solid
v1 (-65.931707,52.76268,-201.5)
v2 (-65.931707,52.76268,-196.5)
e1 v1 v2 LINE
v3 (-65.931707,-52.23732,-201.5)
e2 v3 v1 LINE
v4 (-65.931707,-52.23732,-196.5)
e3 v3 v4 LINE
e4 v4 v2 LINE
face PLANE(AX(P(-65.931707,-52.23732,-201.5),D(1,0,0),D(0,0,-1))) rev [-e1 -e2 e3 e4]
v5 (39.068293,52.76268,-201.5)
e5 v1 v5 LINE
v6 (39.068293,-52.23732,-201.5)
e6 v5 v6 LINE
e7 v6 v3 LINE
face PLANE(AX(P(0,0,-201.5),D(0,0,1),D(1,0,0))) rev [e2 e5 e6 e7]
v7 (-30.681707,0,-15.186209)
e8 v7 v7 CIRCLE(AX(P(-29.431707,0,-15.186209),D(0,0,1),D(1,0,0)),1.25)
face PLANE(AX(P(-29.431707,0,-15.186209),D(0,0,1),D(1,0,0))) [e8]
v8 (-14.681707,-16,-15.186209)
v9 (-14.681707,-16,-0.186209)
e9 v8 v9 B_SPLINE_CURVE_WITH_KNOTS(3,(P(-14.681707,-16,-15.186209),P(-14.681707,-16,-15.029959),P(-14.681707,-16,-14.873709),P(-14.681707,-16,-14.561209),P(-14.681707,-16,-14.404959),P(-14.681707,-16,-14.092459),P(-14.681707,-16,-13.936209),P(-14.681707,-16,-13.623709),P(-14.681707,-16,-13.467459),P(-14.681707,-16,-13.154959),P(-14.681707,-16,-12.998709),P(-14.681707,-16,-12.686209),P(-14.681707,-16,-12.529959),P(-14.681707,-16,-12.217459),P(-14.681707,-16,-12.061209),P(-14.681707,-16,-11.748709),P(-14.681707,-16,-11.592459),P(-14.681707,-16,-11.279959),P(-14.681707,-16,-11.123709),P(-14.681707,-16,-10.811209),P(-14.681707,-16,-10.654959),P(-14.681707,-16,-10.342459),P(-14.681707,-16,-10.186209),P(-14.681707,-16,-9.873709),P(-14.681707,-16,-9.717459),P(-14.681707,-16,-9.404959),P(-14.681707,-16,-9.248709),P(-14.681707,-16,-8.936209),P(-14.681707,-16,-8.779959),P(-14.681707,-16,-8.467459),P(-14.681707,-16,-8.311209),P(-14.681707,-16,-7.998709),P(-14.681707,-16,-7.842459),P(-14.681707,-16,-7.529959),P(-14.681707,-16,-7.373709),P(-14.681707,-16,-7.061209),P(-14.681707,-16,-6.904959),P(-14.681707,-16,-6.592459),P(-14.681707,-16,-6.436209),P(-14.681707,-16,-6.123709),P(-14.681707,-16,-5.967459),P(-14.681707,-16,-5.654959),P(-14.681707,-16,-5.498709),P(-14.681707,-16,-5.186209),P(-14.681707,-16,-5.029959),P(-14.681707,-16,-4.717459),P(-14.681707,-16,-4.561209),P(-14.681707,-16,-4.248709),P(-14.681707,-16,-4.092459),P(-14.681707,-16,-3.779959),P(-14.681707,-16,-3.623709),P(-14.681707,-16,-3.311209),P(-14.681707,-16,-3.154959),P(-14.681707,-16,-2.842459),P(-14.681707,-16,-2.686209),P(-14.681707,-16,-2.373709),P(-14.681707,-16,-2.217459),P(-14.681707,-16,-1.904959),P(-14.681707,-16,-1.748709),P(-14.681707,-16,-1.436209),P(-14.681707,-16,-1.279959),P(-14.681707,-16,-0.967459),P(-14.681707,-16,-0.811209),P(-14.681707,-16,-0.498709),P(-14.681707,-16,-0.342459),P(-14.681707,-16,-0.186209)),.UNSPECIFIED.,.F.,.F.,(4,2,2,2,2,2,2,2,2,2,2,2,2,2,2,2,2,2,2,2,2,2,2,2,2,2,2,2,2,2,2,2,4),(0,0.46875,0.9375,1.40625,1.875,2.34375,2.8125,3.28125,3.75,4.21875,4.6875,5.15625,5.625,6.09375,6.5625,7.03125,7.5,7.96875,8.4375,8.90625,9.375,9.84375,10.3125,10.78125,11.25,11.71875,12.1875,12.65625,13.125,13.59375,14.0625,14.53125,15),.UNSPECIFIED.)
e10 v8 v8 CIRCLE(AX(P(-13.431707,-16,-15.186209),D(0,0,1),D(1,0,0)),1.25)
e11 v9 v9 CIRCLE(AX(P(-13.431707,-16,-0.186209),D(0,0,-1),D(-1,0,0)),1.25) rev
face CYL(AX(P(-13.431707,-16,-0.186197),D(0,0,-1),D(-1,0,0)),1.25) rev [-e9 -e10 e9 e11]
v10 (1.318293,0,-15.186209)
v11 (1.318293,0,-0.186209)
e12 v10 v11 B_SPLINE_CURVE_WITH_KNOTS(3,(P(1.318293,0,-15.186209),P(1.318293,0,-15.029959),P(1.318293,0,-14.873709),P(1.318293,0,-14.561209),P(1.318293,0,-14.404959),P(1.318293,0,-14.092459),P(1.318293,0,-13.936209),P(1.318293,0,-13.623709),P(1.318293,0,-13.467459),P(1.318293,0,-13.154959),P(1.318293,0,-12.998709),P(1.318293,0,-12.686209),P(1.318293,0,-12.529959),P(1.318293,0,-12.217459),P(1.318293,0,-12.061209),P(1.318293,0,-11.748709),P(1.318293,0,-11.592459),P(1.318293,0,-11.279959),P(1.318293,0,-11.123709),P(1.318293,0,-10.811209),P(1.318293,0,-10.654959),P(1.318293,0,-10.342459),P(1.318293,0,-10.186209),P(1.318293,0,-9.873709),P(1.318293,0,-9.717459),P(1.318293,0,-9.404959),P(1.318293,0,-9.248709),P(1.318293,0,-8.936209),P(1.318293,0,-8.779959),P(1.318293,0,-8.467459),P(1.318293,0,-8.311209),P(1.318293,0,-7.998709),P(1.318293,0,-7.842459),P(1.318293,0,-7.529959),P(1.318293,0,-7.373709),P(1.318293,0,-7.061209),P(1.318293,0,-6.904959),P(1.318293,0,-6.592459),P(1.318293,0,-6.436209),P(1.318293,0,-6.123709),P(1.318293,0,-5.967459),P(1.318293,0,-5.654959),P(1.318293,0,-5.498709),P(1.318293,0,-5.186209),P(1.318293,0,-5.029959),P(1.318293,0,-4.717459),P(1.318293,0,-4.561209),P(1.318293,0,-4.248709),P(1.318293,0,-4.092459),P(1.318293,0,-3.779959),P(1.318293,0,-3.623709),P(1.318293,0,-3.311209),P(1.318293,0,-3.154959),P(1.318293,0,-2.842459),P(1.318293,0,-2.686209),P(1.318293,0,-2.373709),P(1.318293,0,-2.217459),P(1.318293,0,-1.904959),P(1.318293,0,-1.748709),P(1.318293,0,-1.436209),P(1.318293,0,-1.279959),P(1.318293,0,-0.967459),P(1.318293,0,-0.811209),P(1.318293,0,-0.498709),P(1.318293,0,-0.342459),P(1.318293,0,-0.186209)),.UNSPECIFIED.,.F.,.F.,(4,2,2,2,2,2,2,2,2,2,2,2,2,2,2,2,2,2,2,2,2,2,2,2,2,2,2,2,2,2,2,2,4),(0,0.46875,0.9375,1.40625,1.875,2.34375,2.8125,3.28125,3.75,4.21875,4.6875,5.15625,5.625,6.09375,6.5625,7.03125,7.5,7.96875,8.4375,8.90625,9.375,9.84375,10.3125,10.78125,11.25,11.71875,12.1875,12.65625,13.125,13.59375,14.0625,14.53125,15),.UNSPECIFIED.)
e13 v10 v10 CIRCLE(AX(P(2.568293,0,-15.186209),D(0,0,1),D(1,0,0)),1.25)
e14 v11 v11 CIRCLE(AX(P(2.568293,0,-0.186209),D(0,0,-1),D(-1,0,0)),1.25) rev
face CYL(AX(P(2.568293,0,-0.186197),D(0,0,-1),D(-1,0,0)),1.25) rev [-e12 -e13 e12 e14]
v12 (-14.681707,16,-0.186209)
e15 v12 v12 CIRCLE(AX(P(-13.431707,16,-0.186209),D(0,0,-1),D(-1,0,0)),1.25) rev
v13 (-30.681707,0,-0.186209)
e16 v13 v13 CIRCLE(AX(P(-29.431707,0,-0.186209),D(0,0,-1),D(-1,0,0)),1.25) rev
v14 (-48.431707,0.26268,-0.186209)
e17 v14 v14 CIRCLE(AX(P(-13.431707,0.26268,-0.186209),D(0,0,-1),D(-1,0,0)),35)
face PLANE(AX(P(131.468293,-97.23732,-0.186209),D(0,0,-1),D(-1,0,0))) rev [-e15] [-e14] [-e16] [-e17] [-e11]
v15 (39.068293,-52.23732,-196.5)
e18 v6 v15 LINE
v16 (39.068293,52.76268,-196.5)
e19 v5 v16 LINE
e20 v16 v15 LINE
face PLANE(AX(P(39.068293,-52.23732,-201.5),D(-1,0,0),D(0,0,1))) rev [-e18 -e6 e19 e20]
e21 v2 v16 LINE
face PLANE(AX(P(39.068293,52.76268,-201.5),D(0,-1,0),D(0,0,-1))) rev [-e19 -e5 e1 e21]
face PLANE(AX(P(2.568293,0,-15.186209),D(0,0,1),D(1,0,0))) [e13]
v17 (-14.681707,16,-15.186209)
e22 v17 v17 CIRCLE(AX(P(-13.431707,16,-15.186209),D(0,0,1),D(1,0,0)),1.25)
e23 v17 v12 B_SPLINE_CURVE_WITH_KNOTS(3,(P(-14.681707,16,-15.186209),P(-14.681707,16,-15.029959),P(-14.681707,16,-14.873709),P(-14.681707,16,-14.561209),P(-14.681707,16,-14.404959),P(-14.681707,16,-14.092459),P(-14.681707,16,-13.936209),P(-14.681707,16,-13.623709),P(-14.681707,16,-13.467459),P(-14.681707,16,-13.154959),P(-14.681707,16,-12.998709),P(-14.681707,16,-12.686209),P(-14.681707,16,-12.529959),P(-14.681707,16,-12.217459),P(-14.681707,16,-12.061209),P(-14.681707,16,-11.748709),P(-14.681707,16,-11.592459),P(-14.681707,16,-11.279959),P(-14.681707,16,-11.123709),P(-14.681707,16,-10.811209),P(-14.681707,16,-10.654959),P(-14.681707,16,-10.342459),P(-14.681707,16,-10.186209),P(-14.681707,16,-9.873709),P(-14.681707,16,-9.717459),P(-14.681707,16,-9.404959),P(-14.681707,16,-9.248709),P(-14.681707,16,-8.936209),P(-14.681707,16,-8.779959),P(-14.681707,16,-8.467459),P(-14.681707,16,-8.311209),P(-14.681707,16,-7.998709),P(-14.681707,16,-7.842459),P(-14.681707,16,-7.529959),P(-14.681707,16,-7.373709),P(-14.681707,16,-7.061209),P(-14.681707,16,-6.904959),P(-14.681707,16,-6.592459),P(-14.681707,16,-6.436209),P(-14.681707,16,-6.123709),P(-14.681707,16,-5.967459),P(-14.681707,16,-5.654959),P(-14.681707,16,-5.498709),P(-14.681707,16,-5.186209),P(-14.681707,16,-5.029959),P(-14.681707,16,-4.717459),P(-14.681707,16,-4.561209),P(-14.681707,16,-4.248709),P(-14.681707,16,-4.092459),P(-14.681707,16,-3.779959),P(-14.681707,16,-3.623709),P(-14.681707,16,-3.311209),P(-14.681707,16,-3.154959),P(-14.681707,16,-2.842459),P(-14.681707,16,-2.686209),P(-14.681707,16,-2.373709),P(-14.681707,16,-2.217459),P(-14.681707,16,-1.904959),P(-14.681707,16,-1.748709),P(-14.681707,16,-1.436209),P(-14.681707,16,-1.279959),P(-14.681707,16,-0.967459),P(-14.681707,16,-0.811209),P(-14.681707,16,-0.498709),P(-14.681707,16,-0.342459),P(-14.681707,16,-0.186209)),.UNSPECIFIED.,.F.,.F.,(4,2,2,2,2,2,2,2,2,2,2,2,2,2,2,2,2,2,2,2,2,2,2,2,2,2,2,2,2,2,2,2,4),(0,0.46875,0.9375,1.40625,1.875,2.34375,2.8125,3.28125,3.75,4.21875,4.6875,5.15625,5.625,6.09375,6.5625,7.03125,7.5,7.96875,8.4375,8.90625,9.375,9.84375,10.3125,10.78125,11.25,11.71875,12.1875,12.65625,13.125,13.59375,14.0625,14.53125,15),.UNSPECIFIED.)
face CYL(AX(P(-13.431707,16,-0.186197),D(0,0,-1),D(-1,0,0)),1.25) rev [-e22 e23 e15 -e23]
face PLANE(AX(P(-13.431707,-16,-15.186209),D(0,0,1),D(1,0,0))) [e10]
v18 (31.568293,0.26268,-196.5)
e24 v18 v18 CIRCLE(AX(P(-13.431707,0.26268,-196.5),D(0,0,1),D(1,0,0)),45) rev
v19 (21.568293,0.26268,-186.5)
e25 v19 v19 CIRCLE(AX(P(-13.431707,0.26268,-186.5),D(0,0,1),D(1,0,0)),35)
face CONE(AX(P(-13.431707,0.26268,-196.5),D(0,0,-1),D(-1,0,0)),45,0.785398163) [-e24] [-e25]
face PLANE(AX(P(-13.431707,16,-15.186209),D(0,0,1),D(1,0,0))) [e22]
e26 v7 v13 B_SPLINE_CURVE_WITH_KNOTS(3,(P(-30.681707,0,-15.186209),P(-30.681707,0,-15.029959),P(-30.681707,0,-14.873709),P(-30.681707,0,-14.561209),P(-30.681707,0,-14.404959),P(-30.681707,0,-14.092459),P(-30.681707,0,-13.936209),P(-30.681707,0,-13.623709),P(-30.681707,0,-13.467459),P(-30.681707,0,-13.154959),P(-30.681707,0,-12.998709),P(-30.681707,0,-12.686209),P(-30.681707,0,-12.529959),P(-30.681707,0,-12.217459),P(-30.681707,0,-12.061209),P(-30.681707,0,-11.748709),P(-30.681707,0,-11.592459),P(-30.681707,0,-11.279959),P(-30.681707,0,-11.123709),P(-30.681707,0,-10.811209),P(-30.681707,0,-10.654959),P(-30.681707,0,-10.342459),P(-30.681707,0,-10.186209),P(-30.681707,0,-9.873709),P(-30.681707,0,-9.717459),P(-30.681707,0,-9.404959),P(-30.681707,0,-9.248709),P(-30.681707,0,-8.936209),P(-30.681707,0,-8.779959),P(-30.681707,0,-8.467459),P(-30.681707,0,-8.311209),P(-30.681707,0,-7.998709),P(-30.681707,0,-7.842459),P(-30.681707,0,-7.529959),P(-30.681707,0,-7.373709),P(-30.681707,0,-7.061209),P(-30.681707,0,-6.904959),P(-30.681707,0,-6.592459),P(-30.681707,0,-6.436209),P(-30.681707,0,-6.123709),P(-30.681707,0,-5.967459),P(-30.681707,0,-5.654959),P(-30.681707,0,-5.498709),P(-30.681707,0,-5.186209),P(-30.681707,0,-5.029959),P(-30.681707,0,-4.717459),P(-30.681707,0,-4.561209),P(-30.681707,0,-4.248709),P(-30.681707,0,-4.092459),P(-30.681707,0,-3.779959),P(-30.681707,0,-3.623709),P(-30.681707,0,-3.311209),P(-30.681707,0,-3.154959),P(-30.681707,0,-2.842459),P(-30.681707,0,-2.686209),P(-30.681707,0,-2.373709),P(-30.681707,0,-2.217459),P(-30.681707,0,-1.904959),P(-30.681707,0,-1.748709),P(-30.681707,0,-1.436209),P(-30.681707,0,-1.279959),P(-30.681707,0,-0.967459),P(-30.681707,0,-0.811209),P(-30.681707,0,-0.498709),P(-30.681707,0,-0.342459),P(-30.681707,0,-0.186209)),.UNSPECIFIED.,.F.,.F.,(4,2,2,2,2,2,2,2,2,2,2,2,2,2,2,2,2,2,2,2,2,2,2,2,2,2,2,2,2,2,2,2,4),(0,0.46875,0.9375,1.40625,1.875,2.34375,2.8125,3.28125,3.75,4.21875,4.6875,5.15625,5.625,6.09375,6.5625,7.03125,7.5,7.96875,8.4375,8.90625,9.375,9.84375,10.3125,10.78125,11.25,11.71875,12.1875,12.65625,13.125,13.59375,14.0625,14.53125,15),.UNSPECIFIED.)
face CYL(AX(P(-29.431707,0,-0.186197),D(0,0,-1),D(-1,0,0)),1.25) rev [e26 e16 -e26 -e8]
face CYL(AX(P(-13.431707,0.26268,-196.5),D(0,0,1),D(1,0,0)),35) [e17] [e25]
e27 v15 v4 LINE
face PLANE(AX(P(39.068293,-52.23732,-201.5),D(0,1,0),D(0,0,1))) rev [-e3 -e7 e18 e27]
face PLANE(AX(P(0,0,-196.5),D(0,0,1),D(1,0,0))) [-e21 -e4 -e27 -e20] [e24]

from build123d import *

# Parameters (mm, degrees)
CROQUIS1_W                  = 248.76
CROQUIS1_H                  = 195
SALIENTE_EXTRUIR1_DEPTH     = 5
CROQUIS2_W                  = 48
CROQUIS2_H                  = 30
CROQUIS2_W_2                = 30
CORTAR_EXTRUIR1_DEPTH       = 2
CROQUIS3_R                  = 2.375
CORTAR_EXTRUIR2_DEPTH       = 10
CROQUIS4_R                  = 35
SALIENTE_EXTRUIR2_DEPTH     = 196.5
CROQUIS5_R                  = 12.5
CORTAR_EXTRUIR3_DEPTH       = 10
CROQUIS12_W                 = 12
CROQUIS12_H                 = 30
SALIENTE_EXTRUIR3_DEPTH     = 4
REDONDEO1_R                 = 10
REDONDEO2_R                 = 10
REDONDEO3_R                 = 10
CORTAR_EXTRUIR5_DEPTH       = 255.266033949
CORTAR_EXTRUIR5_DEPTH_BACK  = 255.266033949
CROQUIS13_R                 = 1.625
CORTAR_EXTRUIR7_DEPTH       = 2
CROQUIS16_W                 = 105
CROQUIS16_H                 = 105
SALIENTE_EXTRUIR4_DEPTH     = 5
CHAFL_N1_SIZE               = 10
CROQUIS18_R                 = 1.625
CORTAR_EXTRUIR8_DEPTH       = 5
CORTAR_EXTRUIR13_DEPTH      = 323.659278543
CORTAR_EXTRUIR13_DEPTH_BACK = 323.659278543
CROQUIS20_W                 = 248.76
CROQUIS20_H                 = 10.372418668
CORTAR_EXTRUIR14_DEPTH      = 237.837226846
CORTAR_EXTRUIR14_DEPTH_BACK = 237.837226846
CROQUIS21_W                 = 75.005088334
CROQUIS21_H                 = 42.55455878
CROQUIS21_W_2               = 80.687232336
CROQUIS21_H_2               = 44.755283474
CORTAR_EXTRUIR15_DEPTH      = 219.307426984
CORTAR_EXTRUIR15_DEPTH_BACK = 15
CROQUIS22_R                 = 1.25


with BuildPart() as part:
    # Croquis1 → Saliente-Extruir1 (new body)
    with BuildSketch(Plane.XY):
        with Locations((7.088293187, 0.26268)):
            Rectangle(CROQUIS1_W, CROQUIS1_H)
    extrude(amount=SALIENTE_EXTRUIR1_DEPTH)

    # Croquis2 → Cortar-Extruir1 (cut)
    with BuildSketch(Plane.XY.offset(5)):
        with Locations((-93.291706813, -82.23732)):
            Rectangle(CROQUIS2_W, CROQUIS2_H)
        with Locations((116.468293187, 82.76268)):
            Rectangle(CROQUIS2_W_2, CROQUIS2_H)
        with Locations((116.468293187, -82.23732)):
            Rectangle(CROQUIS2_W_2, CROQUIS2_H)
        with Locations((-93.291706813, 82.76268)):
            Rectangle(CROQUIS2_W, CROQUIS2_H)
    extrude(amount=-CORTAR_EXTRUIR1_DEPTH, mode=Mode.SUBTRACT)

    # Croquis3 → Cortar-Extruir2 (cut)
    with BuildSketch(Plane.XY.offset(5)):
        with Locations((-93.291706813, 83.76268)):
            Circle(CROQUIS3_R)
        with Locations((-93.291706813, -83.23732)):
            Circle(CROQUIS3_R)
        with Locations((116.468293187, 83.76268)):
            Circle(CROQUIS3_R)
        with Locations((116.468293187, -83.23732)):
            Circle(CROQUIS3_R)
    extrude(amount=-CORTAR_EXTRUIR2_DEPTH, mode=Mode.SUBTRACT)

    # Croquis4 → Saliente-Extruir2 (add)
    with BuildSketch(Plane(origin=(0, 0, 0), x_dir=(-1, 0, 0), z_dir=(0, 0, -1))):
        with Locations((13.431706813, 0.26268)):
            Circle(CROQUIS4_R)
    extrude(amount=SALIENTE_EXTRUIR2_DEPTH)

    # Croquis5 → Cortar-Extruir3 (cut)
    with BuildSketch(Plane(origin=(0, 0, 0), x_dir=(-1, 0, 0), z_dir=(0, 0, -1))):
        with Locations((-76.968293187, 0.26268)):
            Circle(CROQUIS5_R)
    extrude(amount=-CORTAR_EXTRUIR3_DEPTH, mode=Mode.SUBTRACT)

    # Croquis12 → Saliente-Extruir3 (add, symmetric)
    with BuildSketch(Plane(origin=(7.088293187, 0, 0), x_dir=(0, 0, -1), z_dir=(1, 0, 0))):
        with Locations((6, 82.76268)):
            Rectangle(CROQUIS12_W, CROQUIS12_H)
        with Locations((6, -82.23732)):
            Rectangle(CROQUIS12_W, CROQUIS12_H)
    extrude(amount=SALIENTE_EXTRUIR3_DEPTH, both=True)

    # Redondeo1
    redondeo1_edges = [part.edges().sort_by_distance(p)[0] for p in [
        (7.088293187, -67.23732, 0),
        (7.088293187, 67.76268, 0),
    ]]
    fillet(redondeo1_edges, radius=REDONDEO1_R)

    # Redondeo2
    redondeo2_edges = [part.edges().sort_by_distance(p)[0] for p in [
        (7.088293187, 67.76268, -12),
        (7.088293187, -67.23732, -12),
    ]]
    fillet(redondeo2_edges, radius=REDONDEO2_R)

    # Redondeo3
    redondeo3_edges = [part.edges().sort_by_distance(p)[0] for p in [
        (7.088293187, -97.23732, -12),
        (7.088293187, 97.76268, -12),
    ]]
    fillet(redondeo3_edges, radius=REDONDEO3_R)

    # Croquis13 → Cortar-Extruir5 (cut, two sides: drawn at the far end of the back side and taken through both)
    with BuildSketch(Plane(origin=(11.088293187, 0, 0), x_dir=(0, 0, -1), z_dir=(1, 0, 0)).offset(-CORTAR_EXTRUIR5_DEPTH_BACK)):
        with Locations((6, 87.76268)):
            Circle(CROQUIS13_R)
        with Locations((6, 77.76268)):
            Circle(CROQUIS13_R)
        with Locations((6, -77.23732)):
            Circle(CROQUIS13_R)
        with Locations((6, -87.23732)):
            Circle(CROQUIS13_R)
    extrude(amount=CORTAR_EXTRUIR5_DEPTH + CORTAR_EXTRUIR5_DEPTH_BACK, mode=Mode.SUBTRACT)

    # Croquis15 → Cortar-Extruir7 (cut)
    with BuildSketch(Plane.XY.offset(5)):
        Polygon((111.468293187, 67.76268), (131.468293187, 67.76268), (131.468293187, -67.23732), (111.468293187, -67.23732), (111.468293187, -59.48732), (125.218293187, -59.48732), (125.218293187, 60.01268), (111.468293187, 60.01268), align=None)
    extrude(amount=-CORTAR_EXTRUIR7_DEPTH, mode=Mode.SUBTRACT)

    # Croquis16 → Saliente-Extruir4 (add)
    with BuildSketch(Plane(origin=(0, 0, -196.5), x_dir=(-1, 0, 0), z_dir=(0, 0, -1))):
        with Locations((13.431706813, 0.26268)):
            Rectangle(CROQUIS16_W, CROQUIS16_H)
    extrude(amount=SALIENTE_EXTRUIR4_DEPTH)

    # Chaflán1
    chafl_n1_edges = [part.edges().sort_by_distance(p)[0] for p in [
        (21.568293187, 0.26268, -196.5),
    ]]
    chamfer(chafl_n1_edges, length=CHAFL_N1_SIZE)

    # Croquis18 → Cortar-Extruir8 (cut)
    with BuildSketch(Plane.XY.offset(5)):
        with Locations((-13.431706813, 16)):
            Circle(CROQUIS18_R)
        with Locations((2.568293187, 0)):
            Circle(CROQUIS18_R)
        with Locations((-13.431706813, -16)):
            Circle(CROQUIS18_R)
        with Locations((-29.431706813, 0)):
            Circle(CROQUIS18_R)
    extrude(amount=-CORTAR_EXTRUIR8_DEPTH, mode=Mode.SUBTRACT)

    # Croquis20 → Cortar-Extruir13 (cut, two sides: drawn at the far end of the back side and taken through both)
    with BuildSketch(Plane(origin=(-65.931706813, -52.23732, -201.5), x_dir=(1, 0, 0), z_dir=(0, 1, 0)).offset(-CORTAR_EXTRUIR13_DEPTH_BACK)):
        with Locations((73.02, -206.5)):
            Rectangle(CROQUIS20_W, CROQUIS20_H)
    extrude(amount=CORTAR_EXTRUIR13_DEPTH + CORTAR_EXTRUIR13_DEPTH_BACK, mode=Mode.SUBTRACT)


with BuildPart() as cortar_extruir13_piece_1:
    # of the separate pieces the step leaves, piece 1, a body of its own (cortar_extruir13_pieces)
    add(part.part.solids().sort_by_distance((-58.431706813, 0.26268, -196.5))[0])

    # Croquis22 → Cortar-Extruir15 (cut, two sides: drawn at the far end of the back side and taken through both)
    with BuildSketch(Plane.XY.offset(-0.186209334).offset(-CORTAR_EXTRUIR15_DEPTH_BACK)):
        with Locations((-29.431706813, 0)):
            Circle(CROQUIS22_R)
        with Locations((-13.431706813, 16)):
            Circle(CROQUIS22_R)
        with Locations((2.568293187, 0)):
            Circle(CROQUIS22_R)
        with Locations((-13.431706813, -16)):
            Circle(CROQUIS22_R)
    extrude(amount=CORTAR_EXTRUIR15_DEPTH + CORTAR_EXTRUIR15_DEPTH_BACK, mode=Mode.SUBTRACT)


with BuildPart() as cortar_extruir13_piece_2:
    # of the separate pieces the step leaves, piece 2, a body of its own (cortar_extruir13_pieces)
    add(part.part.solids().sort_by_distance((11.088293187, 97.76268, -2))[0])


with BuildPart() as cortar_extruir13_piece_3:
    # of the separate pieces the step leaves, piece 3, a body of its own (cortar_extruir13_pieces)
    add(part.part.solids().sort_by_distance((11.088293187, -97.23732, -2))[0])


with BuildPart() as cortar_extruir14_tool:
    # Croquis21 → Cortar-Extruir14 (new, two sides: drawn at the far end of the back side and taken through both)
    with BuildSketch(Plane(origin=(11.088293187, 0, 0), x_dir=(0, 0, -1), z_dir=(1, 0, 0)).offset(-CORTAR_EXTRUIR14_DEPTH_BACK)):
        with Locations((37.688753501, -75.96004061)):
            Rectangle(CROQUIS21_W, CROQUIS21_H)
        with Locations((40.529825502, 75.385038263)):
            Rectangle(CROQUIS21_W_2, CROQUIS21_H_2)
    extrude(amount=CORTAR_EXTRUIR14_DEPTH + CORTAR_EXTRUIR14_DEPTH_BACK)


with BuildPart() as cortar_extruir13_piece_2_1:
    add(cortar_extruir13_piece_2.part)

    # Cortar-Extruir14: cut by cortar_extruir14_tool
    add(cortar_extruir14_tool.part, mode=Mode.SUBTRACT)


with BuildPart() as cortar_extruir13_piece_3_1:
    add(cortar_extruir13_piece_3.part)

    # Cortar-Extruir14: cut by cortar_extruir14_tool
    add(cortar_extruir14_tool.part, mode=Mode.SUBTRACT)


solid = cortar_extruir13_piece_1.part
